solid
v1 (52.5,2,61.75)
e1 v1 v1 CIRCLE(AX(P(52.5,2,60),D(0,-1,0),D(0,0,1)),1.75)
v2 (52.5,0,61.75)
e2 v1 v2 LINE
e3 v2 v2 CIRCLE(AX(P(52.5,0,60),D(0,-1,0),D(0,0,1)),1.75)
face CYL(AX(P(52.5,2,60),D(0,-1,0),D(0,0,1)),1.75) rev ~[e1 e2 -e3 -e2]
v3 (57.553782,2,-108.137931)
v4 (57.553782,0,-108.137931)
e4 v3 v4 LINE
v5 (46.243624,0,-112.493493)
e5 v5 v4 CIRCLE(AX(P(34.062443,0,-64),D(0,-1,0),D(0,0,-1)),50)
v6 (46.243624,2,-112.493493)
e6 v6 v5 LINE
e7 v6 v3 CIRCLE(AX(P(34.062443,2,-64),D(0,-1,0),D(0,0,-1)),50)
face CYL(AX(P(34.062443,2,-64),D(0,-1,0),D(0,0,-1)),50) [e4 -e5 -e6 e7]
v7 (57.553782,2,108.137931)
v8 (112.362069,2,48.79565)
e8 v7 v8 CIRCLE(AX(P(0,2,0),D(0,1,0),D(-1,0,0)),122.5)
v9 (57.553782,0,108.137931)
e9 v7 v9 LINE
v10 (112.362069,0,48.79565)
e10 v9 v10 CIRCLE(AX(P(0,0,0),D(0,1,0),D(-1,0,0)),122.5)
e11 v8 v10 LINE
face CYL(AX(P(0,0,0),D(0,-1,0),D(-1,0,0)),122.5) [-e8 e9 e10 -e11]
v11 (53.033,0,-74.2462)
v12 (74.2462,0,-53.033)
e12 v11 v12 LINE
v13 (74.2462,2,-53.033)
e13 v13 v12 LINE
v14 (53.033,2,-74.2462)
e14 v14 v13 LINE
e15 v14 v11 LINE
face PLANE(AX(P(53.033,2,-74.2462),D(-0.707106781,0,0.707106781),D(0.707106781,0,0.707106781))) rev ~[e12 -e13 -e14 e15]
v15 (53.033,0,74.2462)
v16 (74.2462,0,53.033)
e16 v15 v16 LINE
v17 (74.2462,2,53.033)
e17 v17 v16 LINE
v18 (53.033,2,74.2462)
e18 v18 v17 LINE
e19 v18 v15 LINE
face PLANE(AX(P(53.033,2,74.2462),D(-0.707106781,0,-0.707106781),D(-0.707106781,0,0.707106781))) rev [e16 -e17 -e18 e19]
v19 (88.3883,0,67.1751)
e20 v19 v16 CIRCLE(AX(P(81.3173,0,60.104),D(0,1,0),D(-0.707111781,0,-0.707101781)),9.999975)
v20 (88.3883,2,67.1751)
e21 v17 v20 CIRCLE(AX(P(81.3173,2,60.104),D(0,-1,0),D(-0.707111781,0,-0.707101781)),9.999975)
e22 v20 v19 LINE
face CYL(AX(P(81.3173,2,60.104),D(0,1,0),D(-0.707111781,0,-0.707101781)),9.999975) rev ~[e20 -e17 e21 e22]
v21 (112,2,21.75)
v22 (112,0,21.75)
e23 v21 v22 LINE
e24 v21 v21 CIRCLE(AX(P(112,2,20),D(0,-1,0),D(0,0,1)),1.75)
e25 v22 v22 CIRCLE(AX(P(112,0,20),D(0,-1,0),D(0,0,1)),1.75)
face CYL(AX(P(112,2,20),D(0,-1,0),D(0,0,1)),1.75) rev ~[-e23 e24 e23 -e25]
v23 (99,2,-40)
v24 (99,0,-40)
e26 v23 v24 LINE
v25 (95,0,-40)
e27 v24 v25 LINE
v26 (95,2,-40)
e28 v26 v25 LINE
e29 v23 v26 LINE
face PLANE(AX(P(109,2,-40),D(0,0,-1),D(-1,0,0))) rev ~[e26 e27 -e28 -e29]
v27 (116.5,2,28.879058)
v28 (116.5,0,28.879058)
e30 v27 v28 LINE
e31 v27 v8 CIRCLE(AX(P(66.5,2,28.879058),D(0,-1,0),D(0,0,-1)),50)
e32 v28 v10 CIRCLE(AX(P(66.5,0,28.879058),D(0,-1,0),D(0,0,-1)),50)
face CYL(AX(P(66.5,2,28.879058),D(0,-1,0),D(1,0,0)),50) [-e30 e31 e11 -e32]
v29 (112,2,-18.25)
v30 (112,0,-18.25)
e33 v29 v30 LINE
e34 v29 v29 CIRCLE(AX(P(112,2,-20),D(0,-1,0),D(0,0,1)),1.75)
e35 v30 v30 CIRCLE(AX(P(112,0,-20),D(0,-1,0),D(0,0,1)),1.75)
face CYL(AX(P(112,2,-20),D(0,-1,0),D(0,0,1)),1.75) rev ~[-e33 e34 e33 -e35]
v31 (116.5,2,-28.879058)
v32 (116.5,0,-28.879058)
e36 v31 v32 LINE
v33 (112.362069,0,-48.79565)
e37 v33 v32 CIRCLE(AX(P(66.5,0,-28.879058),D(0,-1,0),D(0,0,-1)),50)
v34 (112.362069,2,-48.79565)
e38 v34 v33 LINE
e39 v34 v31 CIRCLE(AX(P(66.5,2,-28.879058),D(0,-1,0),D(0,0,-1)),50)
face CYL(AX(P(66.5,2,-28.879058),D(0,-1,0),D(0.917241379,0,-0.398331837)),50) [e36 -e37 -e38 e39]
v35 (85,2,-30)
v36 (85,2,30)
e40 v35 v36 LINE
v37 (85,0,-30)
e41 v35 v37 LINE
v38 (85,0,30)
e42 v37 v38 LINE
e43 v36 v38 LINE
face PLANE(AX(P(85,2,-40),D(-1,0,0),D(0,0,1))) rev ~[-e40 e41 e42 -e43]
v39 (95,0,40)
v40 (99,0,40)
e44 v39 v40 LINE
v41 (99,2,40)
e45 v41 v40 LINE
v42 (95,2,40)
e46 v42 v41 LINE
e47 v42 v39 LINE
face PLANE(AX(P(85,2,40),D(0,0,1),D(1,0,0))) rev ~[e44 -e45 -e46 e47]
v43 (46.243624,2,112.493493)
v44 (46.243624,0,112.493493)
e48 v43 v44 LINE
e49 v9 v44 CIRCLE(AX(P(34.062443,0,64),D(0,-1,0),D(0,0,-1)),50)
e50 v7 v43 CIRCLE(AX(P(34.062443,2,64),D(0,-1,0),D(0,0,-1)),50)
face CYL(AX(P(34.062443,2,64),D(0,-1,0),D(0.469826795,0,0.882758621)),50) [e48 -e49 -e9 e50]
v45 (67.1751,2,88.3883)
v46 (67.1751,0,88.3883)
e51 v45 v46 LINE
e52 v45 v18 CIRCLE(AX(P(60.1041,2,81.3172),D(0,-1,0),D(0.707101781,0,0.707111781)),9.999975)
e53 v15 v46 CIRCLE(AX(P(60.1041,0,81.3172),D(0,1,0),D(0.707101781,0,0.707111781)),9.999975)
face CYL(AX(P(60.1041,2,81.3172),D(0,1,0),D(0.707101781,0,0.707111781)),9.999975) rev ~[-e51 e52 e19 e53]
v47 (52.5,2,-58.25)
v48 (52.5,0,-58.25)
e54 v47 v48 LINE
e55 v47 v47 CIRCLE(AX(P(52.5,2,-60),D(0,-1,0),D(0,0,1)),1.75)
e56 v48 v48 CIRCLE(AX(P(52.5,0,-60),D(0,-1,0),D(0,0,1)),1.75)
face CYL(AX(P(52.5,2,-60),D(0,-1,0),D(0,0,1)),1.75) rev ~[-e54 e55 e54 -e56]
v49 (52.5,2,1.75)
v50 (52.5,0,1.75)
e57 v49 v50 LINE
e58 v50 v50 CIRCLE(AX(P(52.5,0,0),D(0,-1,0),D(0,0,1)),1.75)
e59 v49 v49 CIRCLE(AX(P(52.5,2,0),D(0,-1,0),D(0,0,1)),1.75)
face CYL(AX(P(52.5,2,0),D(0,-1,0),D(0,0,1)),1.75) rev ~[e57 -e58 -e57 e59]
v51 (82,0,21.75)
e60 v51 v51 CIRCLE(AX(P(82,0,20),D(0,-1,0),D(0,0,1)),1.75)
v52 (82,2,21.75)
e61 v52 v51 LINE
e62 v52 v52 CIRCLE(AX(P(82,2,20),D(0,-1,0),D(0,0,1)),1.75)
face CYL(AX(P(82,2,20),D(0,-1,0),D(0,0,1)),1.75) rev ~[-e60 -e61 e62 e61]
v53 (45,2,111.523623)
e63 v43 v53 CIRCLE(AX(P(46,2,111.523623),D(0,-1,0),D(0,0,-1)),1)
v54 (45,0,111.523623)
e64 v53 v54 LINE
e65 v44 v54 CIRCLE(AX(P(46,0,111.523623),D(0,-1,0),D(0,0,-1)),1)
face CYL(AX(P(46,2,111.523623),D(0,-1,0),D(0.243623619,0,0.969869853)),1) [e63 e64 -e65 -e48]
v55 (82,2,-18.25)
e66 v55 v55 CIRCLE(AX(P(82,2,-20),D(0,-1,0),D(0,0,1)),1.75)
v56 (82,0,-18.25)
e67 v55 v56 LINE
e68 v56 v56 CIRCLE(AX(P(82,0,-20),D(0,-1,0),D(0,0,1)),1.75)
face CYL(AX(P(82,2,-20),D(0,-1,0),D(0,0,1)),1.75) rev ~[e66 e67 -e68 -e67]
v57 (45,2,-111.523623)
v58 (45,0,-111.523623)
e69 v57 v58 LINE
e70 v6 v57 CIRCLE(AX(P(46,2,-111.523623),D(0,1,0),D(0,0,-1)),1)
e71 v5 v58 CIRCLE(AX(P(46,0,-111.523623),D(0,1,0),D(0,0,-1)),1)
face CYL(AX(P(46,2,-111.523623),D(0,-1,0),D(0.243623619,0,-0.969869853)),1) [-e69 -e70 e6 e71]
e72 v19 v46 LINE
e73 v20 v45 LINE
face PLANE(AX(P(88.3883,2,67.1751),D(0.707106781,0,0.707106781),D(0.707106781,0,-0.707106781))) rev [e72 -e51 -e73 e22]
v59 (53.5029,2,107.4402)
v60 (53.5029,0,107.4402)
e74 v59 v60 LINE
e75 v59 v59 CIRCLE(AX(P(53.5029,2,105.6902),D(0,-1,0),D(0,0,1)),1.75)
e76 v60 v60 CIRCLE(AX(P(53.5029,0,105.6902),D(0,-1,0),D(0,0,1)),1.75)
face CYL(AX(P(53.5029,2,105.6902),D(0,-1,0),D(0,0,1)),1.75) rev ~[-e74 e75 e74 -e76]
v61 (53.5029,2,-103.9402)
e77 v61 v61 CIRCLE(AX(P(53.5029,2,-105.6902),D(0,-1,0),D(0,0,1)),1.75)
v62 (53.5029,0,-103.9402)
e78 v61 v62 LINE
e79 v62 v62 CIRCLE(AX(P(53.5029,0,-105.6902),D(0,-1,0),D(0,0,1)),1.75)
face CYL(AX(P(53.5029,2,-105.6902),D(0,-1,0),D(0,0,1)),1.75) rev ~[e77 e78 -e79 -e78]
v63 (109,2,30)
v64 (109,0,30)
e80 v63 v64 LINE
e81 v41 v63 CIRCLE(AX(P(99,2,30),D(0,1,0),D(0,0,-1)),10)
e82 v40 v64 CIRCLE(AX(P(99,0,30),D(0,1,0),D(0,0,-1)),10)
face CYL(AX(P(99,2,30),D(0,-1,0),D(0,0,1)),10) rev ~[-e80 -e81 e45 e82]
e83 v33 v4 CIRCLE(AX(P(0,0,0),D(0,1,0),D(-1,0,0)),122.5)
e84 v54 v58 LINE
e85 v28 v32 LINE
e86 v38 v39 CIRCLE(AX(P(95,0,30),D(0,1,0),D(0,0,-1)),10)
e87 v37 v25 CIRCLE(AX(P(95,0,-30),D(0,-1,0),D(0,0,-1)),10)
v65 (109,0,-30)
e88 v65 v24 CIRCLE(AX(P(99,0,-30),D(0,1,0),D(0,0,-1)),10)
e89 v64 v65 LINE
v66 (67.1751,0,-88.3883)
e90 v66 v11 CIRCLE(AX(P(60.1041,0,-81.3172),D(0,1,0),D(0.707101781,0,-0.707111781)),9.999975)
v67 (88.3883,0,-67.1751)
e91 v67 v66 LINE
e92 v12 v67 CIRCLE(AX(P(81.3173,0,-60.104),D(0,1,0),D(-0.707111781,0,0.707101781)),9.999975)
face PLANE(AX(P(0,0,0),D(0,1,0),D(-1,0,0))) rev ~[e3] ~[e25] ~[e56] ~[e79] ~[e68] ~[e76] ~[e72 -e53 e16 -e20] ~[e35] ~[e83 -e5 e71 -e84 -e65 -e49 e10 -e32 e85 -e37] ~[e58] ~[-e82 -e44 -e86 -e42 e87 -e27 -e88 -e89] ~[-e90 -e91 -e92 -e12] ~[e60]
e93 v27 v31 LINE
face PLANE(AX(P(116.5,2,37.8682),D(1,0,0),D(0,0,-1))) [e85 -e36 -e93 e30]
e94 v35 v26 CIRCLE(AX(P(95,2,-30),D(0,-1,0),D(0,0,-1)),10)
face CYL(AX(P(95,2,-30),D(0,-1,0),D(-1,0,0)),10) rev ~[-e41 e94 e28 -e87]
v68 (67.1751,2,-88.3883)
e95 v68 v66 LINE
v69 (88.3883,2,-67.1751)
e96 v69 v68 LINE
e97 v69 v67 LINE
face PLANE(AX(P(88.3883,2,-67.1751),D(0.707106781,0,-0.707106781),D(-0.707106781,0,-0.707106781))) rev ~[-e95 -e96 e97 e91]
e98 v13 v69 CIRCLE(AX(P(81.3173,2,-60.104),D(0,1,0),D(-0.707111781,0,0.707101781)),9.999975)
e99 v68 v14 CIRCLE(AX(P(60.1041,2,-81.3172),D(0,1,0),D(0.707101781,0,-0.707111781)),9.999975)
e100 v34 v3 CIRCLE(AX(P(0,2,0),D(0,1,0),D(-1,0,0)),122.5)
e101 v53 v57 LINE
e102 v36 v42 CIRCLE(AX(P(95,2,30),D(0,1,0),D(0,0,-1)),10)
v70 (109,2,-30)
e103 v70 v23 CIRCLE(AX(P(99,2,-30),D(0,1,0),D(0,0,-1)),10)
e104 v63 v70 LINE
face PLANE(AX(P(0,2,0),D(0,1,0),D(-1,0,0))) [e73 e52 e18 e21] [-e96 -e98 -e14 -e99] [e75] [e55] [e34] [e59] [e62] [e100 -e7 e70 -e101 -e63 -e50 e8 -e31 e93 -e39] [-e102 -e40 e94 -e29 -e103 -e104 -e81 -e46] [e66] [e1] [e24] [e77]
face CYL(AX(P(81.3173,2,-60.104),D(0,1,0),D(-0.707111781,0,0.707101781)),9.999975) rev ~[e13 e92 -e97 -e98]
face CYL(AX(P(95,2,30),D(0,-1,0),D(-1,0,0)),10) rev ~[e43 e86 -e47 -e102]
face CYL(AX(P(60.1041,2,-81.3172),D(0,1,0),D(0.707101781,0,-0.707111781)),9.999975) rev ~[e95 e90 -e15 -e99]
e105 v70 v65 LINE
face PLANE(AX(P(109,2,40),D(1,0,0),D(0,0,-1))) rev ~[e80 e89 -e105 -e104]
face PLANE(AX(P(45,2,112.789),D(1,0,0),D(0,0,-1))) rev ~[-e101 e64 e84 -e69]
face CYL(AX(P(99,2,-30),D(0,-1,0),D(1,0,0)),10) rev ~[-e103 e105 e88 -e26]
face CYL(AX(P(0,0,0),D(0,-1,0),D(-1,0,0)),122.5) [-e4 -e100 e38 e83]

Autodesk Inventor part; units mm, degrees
ref_plane "YZ Plane" through (0, 0, 0) normal (1, 0, 0) x (0, 1, 0)
ref_plane "XZ Plane" through (0, 0, 0) normal (0, 1, 0) x (-1, 0, 0)
ref_plane "XY Plane" through (0, 0, 0) normal (0, 0, 1) x (1, 0, 0)
sketch "スケッチ1" plane through (0, 0, 0) normal (0, 1, 0) x (-1, 0, 0)
  circle A0 centre (0, 0) radius 122.5
  dimension "d0" = 245
extrude "プレート1" add sketch "スケッチ1" along normal blind 2
sketch "スケッチ2" plane through (0, 2, 0) normal (0, 1, 0) x (1, 0, 0)
  line L0 (85, -40) -> (109, -40)
  line L1 (109, -40) -> (109, 40)
  line L2 (109, 40) -> (85, 40)
  line L3 (85, 40) -> (85, -40)
  line L4 (85, -40) -> (109, 40) construction
  line L5 (109, -40) -> (85, 40) construction
  point P0 (0, 0)
  point P1 (97, 0)
  dimension "d2" = 24
  dimension "d3" = 85
  dimension "d6" = 80
extrude "押し出し1" cut sketch "スケッチ2" against normal through all
fillet "フィレット1" radius 10 4 edges at (109, 1, 40) (85, 1, 40) (85, 1, -40) (109, 1, -40)
sketch "スケッチ3" plane through (0, 2, 0) normal (0, 1, 0) x (1, 0, 0)
  line L0 (85, -30) -> (85, 30) projected
  line L1 (109, 30) -> (109, -30) projected
  line L2 (95, 40) -> (99, 40) projected
  line L3 (99, -40) -> (95, -40) projected
  line L4 (82, -20) -> (112, -20) construction
  line L5 (112, -20) -> (112, 20) construction
  line L6 (112, 20) -> (82, 20) construction
  line L7 (82, 20) -> (82, -20) construction
  line L8 (82, -20) -> (112, 20) construction
  line L9 (112, -20) -> (82, 20) construction
  point P0 (0, 0)
  point P1 (97, 0)
  point P2 (97, 40)
  point P3 (109, 0)
  dimension "d8" = 30
  dimension "d9" = 40
hole "穴1" at (82, 2, 20) at (112, 2, 20) at (112, 2, -20) at (82, 2, -20) direction (0, -1, 0) diameter 3.5 depth 2 tip angle 118
sketch "スケッチ4" plane through (0, 2, 0) normal (0, 1, 0) x (1, 0, 0)
  circle A0 centre (0, 0) radius 122.5 projected
  line L0 (-109.4589, 55) -> (-60, 30)
  line L1 (-60, 30) -> (-60, -30)
  line L2 (-60, -30) -> (-109.4589, -55)
  point P0 (-60, 0)
  dimension "d17" = 30
  dimension "d18" = 55
  dimension "d19" = 60
extrude "押し出し2" cut sketch "スケッチ4" against normal through all contours L0 L1 L2 A0 picked at (-80.8333, 0)
sketch "スケッチ5" plane through (0, 2, 0) normal (0, 1, 0) x (1, 0, 0)
  line L0 (-40, 87) -> (40, 87)
  line L1 (40, 87) -> (40, 106)
  line L2 (40, 106) -> (-40, 106)
  line L3 (-40, 106) -> (-40, 87)
  line L4 (-40, 87) -> (40, 106) construction
  line L5 (40, 87) -> (-40, 106) construction
  line L6 (-13.5, 81.5) -> (13.5, 81.5)
  line L7 (13.5, 81.5) -> (13.5, 87)
  line L8 (13.5, 87) -> (-13.5, 87)
  line L9 (-13.5, 87) -> (-13.5, 81.5)
  line L10 (-13.5, 81.5) -> (13.5, 87) construction
  line L11 (13.5, 81.5) -> (-13.5, 87) construction
  line L12 (-13.5, 81.5) -> (-12.7575, 82.2425) construction
  line L13 (-13.5, 81.5) -> (-12.45, 81.5) construction
  line L14 (13.5, 81.5) -> (12.7575, 82.2425) construction
  line L15 (13.5, 81.5) -> (14.55, 81.5) construction
  circle A0 centre (12.7575, 82.2425) radius 1.05
  circle A1 centre (-12.7575, 82.2425) radius 1.05
  line L16 (-13.5, 111.5) -> (13.5, 111.5)
  line L17 (13.5, 111.5) -> (13.5, 106)
  line L18 (13.5, 106) -> (-13.5, 106)
  line L19 (-13.5, 106) -> (-13.5, 111.5)
  line L20 (-13.5, 111.5) -> (13.5, 106) construction
  line L21 (13.5, 111.5) -> (-13.5, 106) construction
  line L22 (-13.5, 111.5) -> (-12.7575, 110.7575) construction
  line L23 (-13.5, 111.5) -> (-12.45, 111.5) construction
  line L24 (13.5, 111.5) -> (12.7575, 110.7575) construction
  line L25 (13.5, 111.5) -> (14.55, 111.5) construction
  circle A2 centre (-12.7575, 110.7575) radius 1.05
  circle A3 centre (12.7575, 110.7575) radius 1.05
  point P0 (0, 0)
  point P1 (0, 96.5)
  point P2 (0, 84.25)
  point P3 (-13.5, 82.9849)
  point P4 (-12.0151, 81.5)
  point P5 (12.0151, 81.5)
  point P6 (13.5, 82.9849)
  point P7 (0, 108.75)
  point P8 (-13.5, 110.0151)
  point P9 (13.5, 110.0151)
  point P10 (12.0151, 111.5)
  point P11 (-12.0151, 111.5)
  dimension "d22" = 19
  dimension "d23" = 80
  dimension "d24" = 87
  dimension "d25" = 5.5
  dimension "d26" = 27
  dimension "d27" = 1.05
  dimension "d28" = 45
  dimension "d29" = 1.05
  dimension "d30" = 135
  dimension "d46" = 5.5
  dimension "d47" = 1.05
  dimension "d48" = 45
  dimension "d49" = 1.05
  dimension "d50" = 135
extrude "押し出し3" cut sketch "スケッチ5" against normal through all
sketch "スケッチ6" plane through (0, 2, 0) normal (0, 1, 0) x (1, 0, 0)
  line L0 (-20, 84) -> (20, 84) construction
  line L1 (-20, 84) -> (20, 84) construction
  line L2 (12.0151, 81.5) -> (-12.0151, 81.5) construction
  line L3 (-20, 109) -> (20, 109) construction
  line L4 (13.5, 106) -> (40, 106) construction
  line L5 (-20, 109) -> (20, 109) construction
  line L6 (-12.0151, 111.5) -> (12.0151, 111.5) construction
  point P0 (0, 0)
  point P1 (0, 84)
  point P2 (0, 109)
  point P3 (0, 84)
  dimension "d33" = 40
  dimension "d34" = 0
  dimension "d35" = 2.5
  dimension "d51" = 40
  dimension "d52" = 0
  dimension "d53" = 2.5
hole "穴2" at (20, 2, -84) at (-20, 2, -84) at (-20, 2, -109) at (20, 2, -109) direction (0, -1, 0) diameter 3.5 depth 2 tip angle 118
fillet "フィレット2" radius 1 4 edges at (-13.5, 1, -87) (13.5, 1, -87) (-13.5, 1, -106) (13.5, 1, -106)
fillet "フィレット3" radius 3 4 edges at (-40, 1, -87) (-40, 1, -106) (40, 1, -106) (40, 1, -87)
mirror "ミラー1" about plane through (0, 0, 0) normal (0, 0, 1) of "穴2", "押し出し3", "フィレット2", "フィレット3"
sketch "スケッチ8" plane through (0, 2, 0) normal (0, 1, 0) x (1, 0, 0)
  arc A0 (-109.4589, -55) -> (-109.4589, 55) centre (0, 0) ccw projected
  line L0 (-12.0151, 111.5) -> (12.0151, 111.5) projected
  line L1 (-44.8358, 114) -> (44.8358, 114)
  line L2 (-44.8358, -114) -> (44.8358, -114)
  line L3 (116.5, -37.8682) -> (116.5, 37.8682)
  arc A1 (-109.4589, -55) -> (-109.4589, 55) centre (0, 0) ccw projected
  circle A2 centre (112, 20) radius 1.75 projected
  line L4 (12.0151, -111.5) -> (-12.0151, -111.5) projected
  dimension "d61" = 4.5
  dimension "d62" = 2.5
  dimension "d63" = 2.5
extrude "押し出し5" cut sketch "スケッチ8" against normal through all contours L2 A0 | L3 A0 | L1 A0
fillet "フィレット5" radius 50 6 edges at (44.8358, 1, 114) (-44.8358, 1, 114) (116.5, 1, -37.8682) (116.5, 1, 37.8682) (-44.8358, 1, -114) (44.8358, 1, -114)
sketch "スケッチ9" plane through (0, 2, 0) normal (0, 1, 0) x (1, 0, 0)
  line L0 (12.0151, 81.5) -> (-12.0151, 81.5) projected
  line L1 (-14.5, 87) -> (-37, 87) projected
  line L2 (37, 87) -> (14.5, 87) projected
  point P0 (0, 0)
  point P1 (-35, 82)
  point P2 (-35, 74)
  point P3 (35, 82)
  point P4 (35, 74)
  dimension "d73" = 8
  dimension "d74" = 8
  dimension "d75" = 35
  dimension "d76" = 35
  dimension "d86" = 5
  dimension "d87" = 5
hole "穴3" at (-35, 2, -82) at (-35, 2, -74) at (35, 2, -82) at (35, 2, -74) direction (0, -1, 0) diameter 3.2 end through all
sketch "スケッチ10" plane through (0, 2, 0) normal (0, 1, 0) x (1, 0, 0)
  line L0 (60.1041, 81.3173) -> (81.3173, 60.1041) construction
  line L1 (53.033, 74.2462) -> (74.2462, 53.033)
  line L2 (88.3883, 67.1751) -> (67.1751, 88.3883)
  arc A0 (67.1751, 88.3883) -> (53.033, 74.2462) centre (60.1041, 81.3173) ccw
  arc A1 (74.2462, 53.033) -> (88.3883, 67.1751) centre (81.3173, 60.1041) ccw
  line L3 (-15, 35) -> (15, 35) construction
  line L4 (-15, 20) -> (15, 20)
  line L5 (15, 50) -> (-15, 50)
  arc A2 (-15, 50) -> (-15, 20) centre (-15, 35) ccw
  arc A3 (15, 20) -> (15, 50) centre (15, 35) ccw
  line L6 (116.5, -28.8791) -> (116.5, 28.8791) projected
  line L7 (0, 0) -> (70.7107, 70.7107) construction
  point P0 (0, 35)
  dimension "d88" = 30
  dimension "d89" = 10
  dimension "d90" = 135
  dimension "d91" = 100
  dimension "d92" = 30
  dimension "d93" = 15
  dimension "d94" = 35
extrude "押し出し6" cut sketch "スケッチ10" against normal through all
mirror "ミラー2" about plane through (0, 0, 0) normal (0, 0, 1) of "穴3", "押し出し6"
fillet "フィレット6" radius 2 4 edges at (-109.4589, 1, -55) (-60, 1, -30) (-60, 1, 30) (-109.4589, 1, 55)
sketch "スケッチ11" plane through (0, 2, 0) normal (0, 1, 0) x (1, 0, 0)
  arc A0 (-57.5538, 108.1379) -> (-108.5332, 56.8048) centre (0, 0) ccw projected
  arc A1 (-55.9094, 105.0483) -> (-106.3353, 53.4211) centre (0, 0) ccw construction
  line L0 (-107.6635, 54.0925) -> (-61.0978, 30.5549) construction
  line L1 (-106.3353, 53.4211) -> (0, 0) construction
  line L2 (0, 0) -> (-73.7957, 93.3552) construction
  point P0 (-103.9973, 57.8408)
  point P1 (-77.6522, 90.1728)
  dimension "d98" = 3.5
  dimension "d99" = 25
  dimension "d100" = 5
  dimension "d101" = 5
hole "穴4" at (-103.9973, 2, -57.8408) at (-77.6522, 2, -90.1728) direction (0, -1, 0) diameter 3.5 end through all
mirror "ミラー3" about plane through (0, 0, 0) normal (0, 0, 1) of "穴4"
sketch "スケッチ12" plane through (0, 2, 0) normal (0, 1, 0) x (1, 0, 0)
  line L0 (-52, 45) -> (-52, 35) construction
  line L1 (-52, 45) -> (-42, 45) construction
  line L2 (-52, -35) -> (-52, -45) construction
  line L3 (-52, -35) -> (-42, -35) construction
  point P0 (0, 0)
  point P1 (-52, 40)
  point P2 (-52, -40)
  dimension "d109" = 10
  dimension "d110" = 90
  dimension "d111" = 10
  dimension "d112" = 90
  dimension "d113" = 40
  dimension "d114" = 40
  dimension "d115" = 52
  dimension "d116" = 52
hole "穴5" at (-52, 2, -45) at (-52, 2, -35) at (-52, 2, 35) at (-52, 2, 45) direction (0, -1, 0) diameter 3.5 depth 2
sketch "スケッチ13" plane through (0, 2, 0) normal (0, 1, 0) x (1, 0, 0)
  arc A0 (57.5538, 108.1379) -> (34.0624, 114) centre (34.0624, 64) ccw projected
  arc A1 (34.0624, -114) -> (57.5538, -108.1379) centre (34.0624, -64) ccw projected
  line L0 (45, 112.789) -> (45, -112.789) construction
  line L1 (45, 112.789) -> (270.5781, 112.789) construction
  line L2 (37.5, -60) -> (52.5, -60) construction
  line L3 (52.5, -60) -> (52.5, 60) construction
  line L4 (52.5, 60) -> (37.5, 60) construction
  line L5 (37.5, 60) -> (37.5, -60) construction
  line L6 (37.5, -60) -> (52.5, 60) construction
  line L7 (52.5, -60) -> (37.5, 60) construction
  arc A2 (34.0624, -110) -> (53.5029, -105.6902) centre (34.0624, -64) ccw construction
  line L8 (34.0624, -64) -> (53.5029, -105.6902) construction
  line L9 (34.0624, -64) -> (34.0624, -110) construction
  arc A3 (53.5029, 105.6902) -> (34.0624, 110) centre (34.0624, 64) ccw construction
  line L10 (34.0624, 64) -> (34.0624, 110) construction
  line L11 (34.0624, 64) -> (80.0624, 64) construction
  line L12 (34.0624, 64) -> (53.5029, 105.6902) construction
  point P0 (0, 0)
  point P1 (45, 0)
  point P2 (52.5, 0)
  point P3 (37.5, 0)
  dimension "d124" = 90
  dimension "d125" = 45
  dimension "d126" = 15
  dimension "d127" = 120
  dimension "d135" = 25
  dimension "d136" = 46
  dimension "d137" = 46
  dimension "d138" = 90
  dimension "d139" = 25
hole "穴6" at (37.5, 2, -60) at (52.5, 2, -60) at (52.5, 2, 0) at (37.5, 2, 0) at (37.5, 2, 60) at (52.5, 2, 60) at (34.0624, 2, -110) at (53.5029, 2, -105.6902) at (34.0624, 2, 110) at (53.5029, 2, 105.6902) direction (0, -1, 0) diameter 3.5 end through all
sketch "スケッチ14" plane through (0, 2, 0) normal (0, 1, 0) x (1, 0, 0)
  arc A0 (57.5538, 108.1379) -> (34.0624, 114) centre (34.0624, 64) ccw projected
  line L0 (34.0624, 114) -> (-34.0624, 114) projected
  arc A1 (-34.0624, 114) -> (-57.5538, 108.1379) centre (-34.0624, 64) ccw projected
  arc A2 (-57.5538, 108.1379) -> (-108.5332, 56.8048) centre (0, 0) ccw projected
  arc A3 (-108.5332, 56.8048) -> (-107.6635, 54.0925) centre (-106.7613, 55.8774) ccw projected
  line L1 (-107.6635, 54.0925) -> (-61.0978, 30.5549) projected
  arc A4 (-60, 28.77) -> (-61.0978, 30.5549) centre (-62, 28.77) ccw projected
  line L2 (-60, 28.77) -> (-60, -28.77) projected
  arc A5 (-61.0978, -30.5549) -> (-60, -28.77) centre (-62, -28.77) ccw projected
  line L3 (-61.0978, -30.5549) -> (-107.6635, -54.0925) projected
  arc A6 (-107.6635, -54.0925) -> (-108.5332, -56.8048) centre (-106.7613, -55.8774) ccw projected
  arc A7 (-108.5332, -56.8048) -> (-57.5538, -108.1379) centre (0, 0) ccw projected
  arc A8 (-57.5538, -108.1379) -> (-34.0624, -114) centre (-34.0624, -64) ccw projected
  line L4 (-34.0624, -114) -> (34.0624, -114) projected
  arc A9 (34.0624, -114) -> (57.5538, -108.1379) centre (34.0624, -64) ccw projected
  line L5 (45, -112.789) -> (45, 112.789)
  arc A10 (57.5538, 108.1379) -> (34.0624, 114) centre (34.0624, 64) ccw projected
  dimension "d140" = 45
extrude "押し出し7" cut sketch "スケッチ14" against normal through all
fillet "フィレット7" radius 1 2 edges at (45, 1, 112.789) (45, 1, -112.789)
equation "\"d15\" = Thickness"
equation "\"d46\" = d25"
equation "\"d53\" = d35"
equation "\"d41\" = Thickness"
equation "\"d63\" = d62"
equation "\"d73\" = d71"
equation "\"d74\" = d71"
equation "\"d76\" = d75"
equation "\"d87\" = d86"
equation "\"d84\" = Thickness"
equation "\"d101\" = d100"
equation "\"d107\" = Thickness"
equation "\"d114\" = d113"
equation "\"d116\" = d115"
equation "\"d122\" = Thickness"
equation "\"d133\" = Thickness"
equation "\"d1\" = Thickness"
equation "\"BendRadius\" = Thickness"
equation "\"BendReliefWidth\" = Thickness"
equation "\"BendReliefDepth\" = 0.5 * Thickness"
equation "\"CornerReliefSize\" = 4 * Thickness"
equation "\"MinimumRemnant\" = 2 * Thickness"
equation "\"TransitionRadius\" = BendRadius"
equation "\"JacobiRadiusSize\" = BendRadius"
equation "\"GapSize\" = Thickness"
equation "\"Thickness\" = 2"
equation "\"d71\" = 8"
properties part number "T2.0_frame-base2-extended-1"
